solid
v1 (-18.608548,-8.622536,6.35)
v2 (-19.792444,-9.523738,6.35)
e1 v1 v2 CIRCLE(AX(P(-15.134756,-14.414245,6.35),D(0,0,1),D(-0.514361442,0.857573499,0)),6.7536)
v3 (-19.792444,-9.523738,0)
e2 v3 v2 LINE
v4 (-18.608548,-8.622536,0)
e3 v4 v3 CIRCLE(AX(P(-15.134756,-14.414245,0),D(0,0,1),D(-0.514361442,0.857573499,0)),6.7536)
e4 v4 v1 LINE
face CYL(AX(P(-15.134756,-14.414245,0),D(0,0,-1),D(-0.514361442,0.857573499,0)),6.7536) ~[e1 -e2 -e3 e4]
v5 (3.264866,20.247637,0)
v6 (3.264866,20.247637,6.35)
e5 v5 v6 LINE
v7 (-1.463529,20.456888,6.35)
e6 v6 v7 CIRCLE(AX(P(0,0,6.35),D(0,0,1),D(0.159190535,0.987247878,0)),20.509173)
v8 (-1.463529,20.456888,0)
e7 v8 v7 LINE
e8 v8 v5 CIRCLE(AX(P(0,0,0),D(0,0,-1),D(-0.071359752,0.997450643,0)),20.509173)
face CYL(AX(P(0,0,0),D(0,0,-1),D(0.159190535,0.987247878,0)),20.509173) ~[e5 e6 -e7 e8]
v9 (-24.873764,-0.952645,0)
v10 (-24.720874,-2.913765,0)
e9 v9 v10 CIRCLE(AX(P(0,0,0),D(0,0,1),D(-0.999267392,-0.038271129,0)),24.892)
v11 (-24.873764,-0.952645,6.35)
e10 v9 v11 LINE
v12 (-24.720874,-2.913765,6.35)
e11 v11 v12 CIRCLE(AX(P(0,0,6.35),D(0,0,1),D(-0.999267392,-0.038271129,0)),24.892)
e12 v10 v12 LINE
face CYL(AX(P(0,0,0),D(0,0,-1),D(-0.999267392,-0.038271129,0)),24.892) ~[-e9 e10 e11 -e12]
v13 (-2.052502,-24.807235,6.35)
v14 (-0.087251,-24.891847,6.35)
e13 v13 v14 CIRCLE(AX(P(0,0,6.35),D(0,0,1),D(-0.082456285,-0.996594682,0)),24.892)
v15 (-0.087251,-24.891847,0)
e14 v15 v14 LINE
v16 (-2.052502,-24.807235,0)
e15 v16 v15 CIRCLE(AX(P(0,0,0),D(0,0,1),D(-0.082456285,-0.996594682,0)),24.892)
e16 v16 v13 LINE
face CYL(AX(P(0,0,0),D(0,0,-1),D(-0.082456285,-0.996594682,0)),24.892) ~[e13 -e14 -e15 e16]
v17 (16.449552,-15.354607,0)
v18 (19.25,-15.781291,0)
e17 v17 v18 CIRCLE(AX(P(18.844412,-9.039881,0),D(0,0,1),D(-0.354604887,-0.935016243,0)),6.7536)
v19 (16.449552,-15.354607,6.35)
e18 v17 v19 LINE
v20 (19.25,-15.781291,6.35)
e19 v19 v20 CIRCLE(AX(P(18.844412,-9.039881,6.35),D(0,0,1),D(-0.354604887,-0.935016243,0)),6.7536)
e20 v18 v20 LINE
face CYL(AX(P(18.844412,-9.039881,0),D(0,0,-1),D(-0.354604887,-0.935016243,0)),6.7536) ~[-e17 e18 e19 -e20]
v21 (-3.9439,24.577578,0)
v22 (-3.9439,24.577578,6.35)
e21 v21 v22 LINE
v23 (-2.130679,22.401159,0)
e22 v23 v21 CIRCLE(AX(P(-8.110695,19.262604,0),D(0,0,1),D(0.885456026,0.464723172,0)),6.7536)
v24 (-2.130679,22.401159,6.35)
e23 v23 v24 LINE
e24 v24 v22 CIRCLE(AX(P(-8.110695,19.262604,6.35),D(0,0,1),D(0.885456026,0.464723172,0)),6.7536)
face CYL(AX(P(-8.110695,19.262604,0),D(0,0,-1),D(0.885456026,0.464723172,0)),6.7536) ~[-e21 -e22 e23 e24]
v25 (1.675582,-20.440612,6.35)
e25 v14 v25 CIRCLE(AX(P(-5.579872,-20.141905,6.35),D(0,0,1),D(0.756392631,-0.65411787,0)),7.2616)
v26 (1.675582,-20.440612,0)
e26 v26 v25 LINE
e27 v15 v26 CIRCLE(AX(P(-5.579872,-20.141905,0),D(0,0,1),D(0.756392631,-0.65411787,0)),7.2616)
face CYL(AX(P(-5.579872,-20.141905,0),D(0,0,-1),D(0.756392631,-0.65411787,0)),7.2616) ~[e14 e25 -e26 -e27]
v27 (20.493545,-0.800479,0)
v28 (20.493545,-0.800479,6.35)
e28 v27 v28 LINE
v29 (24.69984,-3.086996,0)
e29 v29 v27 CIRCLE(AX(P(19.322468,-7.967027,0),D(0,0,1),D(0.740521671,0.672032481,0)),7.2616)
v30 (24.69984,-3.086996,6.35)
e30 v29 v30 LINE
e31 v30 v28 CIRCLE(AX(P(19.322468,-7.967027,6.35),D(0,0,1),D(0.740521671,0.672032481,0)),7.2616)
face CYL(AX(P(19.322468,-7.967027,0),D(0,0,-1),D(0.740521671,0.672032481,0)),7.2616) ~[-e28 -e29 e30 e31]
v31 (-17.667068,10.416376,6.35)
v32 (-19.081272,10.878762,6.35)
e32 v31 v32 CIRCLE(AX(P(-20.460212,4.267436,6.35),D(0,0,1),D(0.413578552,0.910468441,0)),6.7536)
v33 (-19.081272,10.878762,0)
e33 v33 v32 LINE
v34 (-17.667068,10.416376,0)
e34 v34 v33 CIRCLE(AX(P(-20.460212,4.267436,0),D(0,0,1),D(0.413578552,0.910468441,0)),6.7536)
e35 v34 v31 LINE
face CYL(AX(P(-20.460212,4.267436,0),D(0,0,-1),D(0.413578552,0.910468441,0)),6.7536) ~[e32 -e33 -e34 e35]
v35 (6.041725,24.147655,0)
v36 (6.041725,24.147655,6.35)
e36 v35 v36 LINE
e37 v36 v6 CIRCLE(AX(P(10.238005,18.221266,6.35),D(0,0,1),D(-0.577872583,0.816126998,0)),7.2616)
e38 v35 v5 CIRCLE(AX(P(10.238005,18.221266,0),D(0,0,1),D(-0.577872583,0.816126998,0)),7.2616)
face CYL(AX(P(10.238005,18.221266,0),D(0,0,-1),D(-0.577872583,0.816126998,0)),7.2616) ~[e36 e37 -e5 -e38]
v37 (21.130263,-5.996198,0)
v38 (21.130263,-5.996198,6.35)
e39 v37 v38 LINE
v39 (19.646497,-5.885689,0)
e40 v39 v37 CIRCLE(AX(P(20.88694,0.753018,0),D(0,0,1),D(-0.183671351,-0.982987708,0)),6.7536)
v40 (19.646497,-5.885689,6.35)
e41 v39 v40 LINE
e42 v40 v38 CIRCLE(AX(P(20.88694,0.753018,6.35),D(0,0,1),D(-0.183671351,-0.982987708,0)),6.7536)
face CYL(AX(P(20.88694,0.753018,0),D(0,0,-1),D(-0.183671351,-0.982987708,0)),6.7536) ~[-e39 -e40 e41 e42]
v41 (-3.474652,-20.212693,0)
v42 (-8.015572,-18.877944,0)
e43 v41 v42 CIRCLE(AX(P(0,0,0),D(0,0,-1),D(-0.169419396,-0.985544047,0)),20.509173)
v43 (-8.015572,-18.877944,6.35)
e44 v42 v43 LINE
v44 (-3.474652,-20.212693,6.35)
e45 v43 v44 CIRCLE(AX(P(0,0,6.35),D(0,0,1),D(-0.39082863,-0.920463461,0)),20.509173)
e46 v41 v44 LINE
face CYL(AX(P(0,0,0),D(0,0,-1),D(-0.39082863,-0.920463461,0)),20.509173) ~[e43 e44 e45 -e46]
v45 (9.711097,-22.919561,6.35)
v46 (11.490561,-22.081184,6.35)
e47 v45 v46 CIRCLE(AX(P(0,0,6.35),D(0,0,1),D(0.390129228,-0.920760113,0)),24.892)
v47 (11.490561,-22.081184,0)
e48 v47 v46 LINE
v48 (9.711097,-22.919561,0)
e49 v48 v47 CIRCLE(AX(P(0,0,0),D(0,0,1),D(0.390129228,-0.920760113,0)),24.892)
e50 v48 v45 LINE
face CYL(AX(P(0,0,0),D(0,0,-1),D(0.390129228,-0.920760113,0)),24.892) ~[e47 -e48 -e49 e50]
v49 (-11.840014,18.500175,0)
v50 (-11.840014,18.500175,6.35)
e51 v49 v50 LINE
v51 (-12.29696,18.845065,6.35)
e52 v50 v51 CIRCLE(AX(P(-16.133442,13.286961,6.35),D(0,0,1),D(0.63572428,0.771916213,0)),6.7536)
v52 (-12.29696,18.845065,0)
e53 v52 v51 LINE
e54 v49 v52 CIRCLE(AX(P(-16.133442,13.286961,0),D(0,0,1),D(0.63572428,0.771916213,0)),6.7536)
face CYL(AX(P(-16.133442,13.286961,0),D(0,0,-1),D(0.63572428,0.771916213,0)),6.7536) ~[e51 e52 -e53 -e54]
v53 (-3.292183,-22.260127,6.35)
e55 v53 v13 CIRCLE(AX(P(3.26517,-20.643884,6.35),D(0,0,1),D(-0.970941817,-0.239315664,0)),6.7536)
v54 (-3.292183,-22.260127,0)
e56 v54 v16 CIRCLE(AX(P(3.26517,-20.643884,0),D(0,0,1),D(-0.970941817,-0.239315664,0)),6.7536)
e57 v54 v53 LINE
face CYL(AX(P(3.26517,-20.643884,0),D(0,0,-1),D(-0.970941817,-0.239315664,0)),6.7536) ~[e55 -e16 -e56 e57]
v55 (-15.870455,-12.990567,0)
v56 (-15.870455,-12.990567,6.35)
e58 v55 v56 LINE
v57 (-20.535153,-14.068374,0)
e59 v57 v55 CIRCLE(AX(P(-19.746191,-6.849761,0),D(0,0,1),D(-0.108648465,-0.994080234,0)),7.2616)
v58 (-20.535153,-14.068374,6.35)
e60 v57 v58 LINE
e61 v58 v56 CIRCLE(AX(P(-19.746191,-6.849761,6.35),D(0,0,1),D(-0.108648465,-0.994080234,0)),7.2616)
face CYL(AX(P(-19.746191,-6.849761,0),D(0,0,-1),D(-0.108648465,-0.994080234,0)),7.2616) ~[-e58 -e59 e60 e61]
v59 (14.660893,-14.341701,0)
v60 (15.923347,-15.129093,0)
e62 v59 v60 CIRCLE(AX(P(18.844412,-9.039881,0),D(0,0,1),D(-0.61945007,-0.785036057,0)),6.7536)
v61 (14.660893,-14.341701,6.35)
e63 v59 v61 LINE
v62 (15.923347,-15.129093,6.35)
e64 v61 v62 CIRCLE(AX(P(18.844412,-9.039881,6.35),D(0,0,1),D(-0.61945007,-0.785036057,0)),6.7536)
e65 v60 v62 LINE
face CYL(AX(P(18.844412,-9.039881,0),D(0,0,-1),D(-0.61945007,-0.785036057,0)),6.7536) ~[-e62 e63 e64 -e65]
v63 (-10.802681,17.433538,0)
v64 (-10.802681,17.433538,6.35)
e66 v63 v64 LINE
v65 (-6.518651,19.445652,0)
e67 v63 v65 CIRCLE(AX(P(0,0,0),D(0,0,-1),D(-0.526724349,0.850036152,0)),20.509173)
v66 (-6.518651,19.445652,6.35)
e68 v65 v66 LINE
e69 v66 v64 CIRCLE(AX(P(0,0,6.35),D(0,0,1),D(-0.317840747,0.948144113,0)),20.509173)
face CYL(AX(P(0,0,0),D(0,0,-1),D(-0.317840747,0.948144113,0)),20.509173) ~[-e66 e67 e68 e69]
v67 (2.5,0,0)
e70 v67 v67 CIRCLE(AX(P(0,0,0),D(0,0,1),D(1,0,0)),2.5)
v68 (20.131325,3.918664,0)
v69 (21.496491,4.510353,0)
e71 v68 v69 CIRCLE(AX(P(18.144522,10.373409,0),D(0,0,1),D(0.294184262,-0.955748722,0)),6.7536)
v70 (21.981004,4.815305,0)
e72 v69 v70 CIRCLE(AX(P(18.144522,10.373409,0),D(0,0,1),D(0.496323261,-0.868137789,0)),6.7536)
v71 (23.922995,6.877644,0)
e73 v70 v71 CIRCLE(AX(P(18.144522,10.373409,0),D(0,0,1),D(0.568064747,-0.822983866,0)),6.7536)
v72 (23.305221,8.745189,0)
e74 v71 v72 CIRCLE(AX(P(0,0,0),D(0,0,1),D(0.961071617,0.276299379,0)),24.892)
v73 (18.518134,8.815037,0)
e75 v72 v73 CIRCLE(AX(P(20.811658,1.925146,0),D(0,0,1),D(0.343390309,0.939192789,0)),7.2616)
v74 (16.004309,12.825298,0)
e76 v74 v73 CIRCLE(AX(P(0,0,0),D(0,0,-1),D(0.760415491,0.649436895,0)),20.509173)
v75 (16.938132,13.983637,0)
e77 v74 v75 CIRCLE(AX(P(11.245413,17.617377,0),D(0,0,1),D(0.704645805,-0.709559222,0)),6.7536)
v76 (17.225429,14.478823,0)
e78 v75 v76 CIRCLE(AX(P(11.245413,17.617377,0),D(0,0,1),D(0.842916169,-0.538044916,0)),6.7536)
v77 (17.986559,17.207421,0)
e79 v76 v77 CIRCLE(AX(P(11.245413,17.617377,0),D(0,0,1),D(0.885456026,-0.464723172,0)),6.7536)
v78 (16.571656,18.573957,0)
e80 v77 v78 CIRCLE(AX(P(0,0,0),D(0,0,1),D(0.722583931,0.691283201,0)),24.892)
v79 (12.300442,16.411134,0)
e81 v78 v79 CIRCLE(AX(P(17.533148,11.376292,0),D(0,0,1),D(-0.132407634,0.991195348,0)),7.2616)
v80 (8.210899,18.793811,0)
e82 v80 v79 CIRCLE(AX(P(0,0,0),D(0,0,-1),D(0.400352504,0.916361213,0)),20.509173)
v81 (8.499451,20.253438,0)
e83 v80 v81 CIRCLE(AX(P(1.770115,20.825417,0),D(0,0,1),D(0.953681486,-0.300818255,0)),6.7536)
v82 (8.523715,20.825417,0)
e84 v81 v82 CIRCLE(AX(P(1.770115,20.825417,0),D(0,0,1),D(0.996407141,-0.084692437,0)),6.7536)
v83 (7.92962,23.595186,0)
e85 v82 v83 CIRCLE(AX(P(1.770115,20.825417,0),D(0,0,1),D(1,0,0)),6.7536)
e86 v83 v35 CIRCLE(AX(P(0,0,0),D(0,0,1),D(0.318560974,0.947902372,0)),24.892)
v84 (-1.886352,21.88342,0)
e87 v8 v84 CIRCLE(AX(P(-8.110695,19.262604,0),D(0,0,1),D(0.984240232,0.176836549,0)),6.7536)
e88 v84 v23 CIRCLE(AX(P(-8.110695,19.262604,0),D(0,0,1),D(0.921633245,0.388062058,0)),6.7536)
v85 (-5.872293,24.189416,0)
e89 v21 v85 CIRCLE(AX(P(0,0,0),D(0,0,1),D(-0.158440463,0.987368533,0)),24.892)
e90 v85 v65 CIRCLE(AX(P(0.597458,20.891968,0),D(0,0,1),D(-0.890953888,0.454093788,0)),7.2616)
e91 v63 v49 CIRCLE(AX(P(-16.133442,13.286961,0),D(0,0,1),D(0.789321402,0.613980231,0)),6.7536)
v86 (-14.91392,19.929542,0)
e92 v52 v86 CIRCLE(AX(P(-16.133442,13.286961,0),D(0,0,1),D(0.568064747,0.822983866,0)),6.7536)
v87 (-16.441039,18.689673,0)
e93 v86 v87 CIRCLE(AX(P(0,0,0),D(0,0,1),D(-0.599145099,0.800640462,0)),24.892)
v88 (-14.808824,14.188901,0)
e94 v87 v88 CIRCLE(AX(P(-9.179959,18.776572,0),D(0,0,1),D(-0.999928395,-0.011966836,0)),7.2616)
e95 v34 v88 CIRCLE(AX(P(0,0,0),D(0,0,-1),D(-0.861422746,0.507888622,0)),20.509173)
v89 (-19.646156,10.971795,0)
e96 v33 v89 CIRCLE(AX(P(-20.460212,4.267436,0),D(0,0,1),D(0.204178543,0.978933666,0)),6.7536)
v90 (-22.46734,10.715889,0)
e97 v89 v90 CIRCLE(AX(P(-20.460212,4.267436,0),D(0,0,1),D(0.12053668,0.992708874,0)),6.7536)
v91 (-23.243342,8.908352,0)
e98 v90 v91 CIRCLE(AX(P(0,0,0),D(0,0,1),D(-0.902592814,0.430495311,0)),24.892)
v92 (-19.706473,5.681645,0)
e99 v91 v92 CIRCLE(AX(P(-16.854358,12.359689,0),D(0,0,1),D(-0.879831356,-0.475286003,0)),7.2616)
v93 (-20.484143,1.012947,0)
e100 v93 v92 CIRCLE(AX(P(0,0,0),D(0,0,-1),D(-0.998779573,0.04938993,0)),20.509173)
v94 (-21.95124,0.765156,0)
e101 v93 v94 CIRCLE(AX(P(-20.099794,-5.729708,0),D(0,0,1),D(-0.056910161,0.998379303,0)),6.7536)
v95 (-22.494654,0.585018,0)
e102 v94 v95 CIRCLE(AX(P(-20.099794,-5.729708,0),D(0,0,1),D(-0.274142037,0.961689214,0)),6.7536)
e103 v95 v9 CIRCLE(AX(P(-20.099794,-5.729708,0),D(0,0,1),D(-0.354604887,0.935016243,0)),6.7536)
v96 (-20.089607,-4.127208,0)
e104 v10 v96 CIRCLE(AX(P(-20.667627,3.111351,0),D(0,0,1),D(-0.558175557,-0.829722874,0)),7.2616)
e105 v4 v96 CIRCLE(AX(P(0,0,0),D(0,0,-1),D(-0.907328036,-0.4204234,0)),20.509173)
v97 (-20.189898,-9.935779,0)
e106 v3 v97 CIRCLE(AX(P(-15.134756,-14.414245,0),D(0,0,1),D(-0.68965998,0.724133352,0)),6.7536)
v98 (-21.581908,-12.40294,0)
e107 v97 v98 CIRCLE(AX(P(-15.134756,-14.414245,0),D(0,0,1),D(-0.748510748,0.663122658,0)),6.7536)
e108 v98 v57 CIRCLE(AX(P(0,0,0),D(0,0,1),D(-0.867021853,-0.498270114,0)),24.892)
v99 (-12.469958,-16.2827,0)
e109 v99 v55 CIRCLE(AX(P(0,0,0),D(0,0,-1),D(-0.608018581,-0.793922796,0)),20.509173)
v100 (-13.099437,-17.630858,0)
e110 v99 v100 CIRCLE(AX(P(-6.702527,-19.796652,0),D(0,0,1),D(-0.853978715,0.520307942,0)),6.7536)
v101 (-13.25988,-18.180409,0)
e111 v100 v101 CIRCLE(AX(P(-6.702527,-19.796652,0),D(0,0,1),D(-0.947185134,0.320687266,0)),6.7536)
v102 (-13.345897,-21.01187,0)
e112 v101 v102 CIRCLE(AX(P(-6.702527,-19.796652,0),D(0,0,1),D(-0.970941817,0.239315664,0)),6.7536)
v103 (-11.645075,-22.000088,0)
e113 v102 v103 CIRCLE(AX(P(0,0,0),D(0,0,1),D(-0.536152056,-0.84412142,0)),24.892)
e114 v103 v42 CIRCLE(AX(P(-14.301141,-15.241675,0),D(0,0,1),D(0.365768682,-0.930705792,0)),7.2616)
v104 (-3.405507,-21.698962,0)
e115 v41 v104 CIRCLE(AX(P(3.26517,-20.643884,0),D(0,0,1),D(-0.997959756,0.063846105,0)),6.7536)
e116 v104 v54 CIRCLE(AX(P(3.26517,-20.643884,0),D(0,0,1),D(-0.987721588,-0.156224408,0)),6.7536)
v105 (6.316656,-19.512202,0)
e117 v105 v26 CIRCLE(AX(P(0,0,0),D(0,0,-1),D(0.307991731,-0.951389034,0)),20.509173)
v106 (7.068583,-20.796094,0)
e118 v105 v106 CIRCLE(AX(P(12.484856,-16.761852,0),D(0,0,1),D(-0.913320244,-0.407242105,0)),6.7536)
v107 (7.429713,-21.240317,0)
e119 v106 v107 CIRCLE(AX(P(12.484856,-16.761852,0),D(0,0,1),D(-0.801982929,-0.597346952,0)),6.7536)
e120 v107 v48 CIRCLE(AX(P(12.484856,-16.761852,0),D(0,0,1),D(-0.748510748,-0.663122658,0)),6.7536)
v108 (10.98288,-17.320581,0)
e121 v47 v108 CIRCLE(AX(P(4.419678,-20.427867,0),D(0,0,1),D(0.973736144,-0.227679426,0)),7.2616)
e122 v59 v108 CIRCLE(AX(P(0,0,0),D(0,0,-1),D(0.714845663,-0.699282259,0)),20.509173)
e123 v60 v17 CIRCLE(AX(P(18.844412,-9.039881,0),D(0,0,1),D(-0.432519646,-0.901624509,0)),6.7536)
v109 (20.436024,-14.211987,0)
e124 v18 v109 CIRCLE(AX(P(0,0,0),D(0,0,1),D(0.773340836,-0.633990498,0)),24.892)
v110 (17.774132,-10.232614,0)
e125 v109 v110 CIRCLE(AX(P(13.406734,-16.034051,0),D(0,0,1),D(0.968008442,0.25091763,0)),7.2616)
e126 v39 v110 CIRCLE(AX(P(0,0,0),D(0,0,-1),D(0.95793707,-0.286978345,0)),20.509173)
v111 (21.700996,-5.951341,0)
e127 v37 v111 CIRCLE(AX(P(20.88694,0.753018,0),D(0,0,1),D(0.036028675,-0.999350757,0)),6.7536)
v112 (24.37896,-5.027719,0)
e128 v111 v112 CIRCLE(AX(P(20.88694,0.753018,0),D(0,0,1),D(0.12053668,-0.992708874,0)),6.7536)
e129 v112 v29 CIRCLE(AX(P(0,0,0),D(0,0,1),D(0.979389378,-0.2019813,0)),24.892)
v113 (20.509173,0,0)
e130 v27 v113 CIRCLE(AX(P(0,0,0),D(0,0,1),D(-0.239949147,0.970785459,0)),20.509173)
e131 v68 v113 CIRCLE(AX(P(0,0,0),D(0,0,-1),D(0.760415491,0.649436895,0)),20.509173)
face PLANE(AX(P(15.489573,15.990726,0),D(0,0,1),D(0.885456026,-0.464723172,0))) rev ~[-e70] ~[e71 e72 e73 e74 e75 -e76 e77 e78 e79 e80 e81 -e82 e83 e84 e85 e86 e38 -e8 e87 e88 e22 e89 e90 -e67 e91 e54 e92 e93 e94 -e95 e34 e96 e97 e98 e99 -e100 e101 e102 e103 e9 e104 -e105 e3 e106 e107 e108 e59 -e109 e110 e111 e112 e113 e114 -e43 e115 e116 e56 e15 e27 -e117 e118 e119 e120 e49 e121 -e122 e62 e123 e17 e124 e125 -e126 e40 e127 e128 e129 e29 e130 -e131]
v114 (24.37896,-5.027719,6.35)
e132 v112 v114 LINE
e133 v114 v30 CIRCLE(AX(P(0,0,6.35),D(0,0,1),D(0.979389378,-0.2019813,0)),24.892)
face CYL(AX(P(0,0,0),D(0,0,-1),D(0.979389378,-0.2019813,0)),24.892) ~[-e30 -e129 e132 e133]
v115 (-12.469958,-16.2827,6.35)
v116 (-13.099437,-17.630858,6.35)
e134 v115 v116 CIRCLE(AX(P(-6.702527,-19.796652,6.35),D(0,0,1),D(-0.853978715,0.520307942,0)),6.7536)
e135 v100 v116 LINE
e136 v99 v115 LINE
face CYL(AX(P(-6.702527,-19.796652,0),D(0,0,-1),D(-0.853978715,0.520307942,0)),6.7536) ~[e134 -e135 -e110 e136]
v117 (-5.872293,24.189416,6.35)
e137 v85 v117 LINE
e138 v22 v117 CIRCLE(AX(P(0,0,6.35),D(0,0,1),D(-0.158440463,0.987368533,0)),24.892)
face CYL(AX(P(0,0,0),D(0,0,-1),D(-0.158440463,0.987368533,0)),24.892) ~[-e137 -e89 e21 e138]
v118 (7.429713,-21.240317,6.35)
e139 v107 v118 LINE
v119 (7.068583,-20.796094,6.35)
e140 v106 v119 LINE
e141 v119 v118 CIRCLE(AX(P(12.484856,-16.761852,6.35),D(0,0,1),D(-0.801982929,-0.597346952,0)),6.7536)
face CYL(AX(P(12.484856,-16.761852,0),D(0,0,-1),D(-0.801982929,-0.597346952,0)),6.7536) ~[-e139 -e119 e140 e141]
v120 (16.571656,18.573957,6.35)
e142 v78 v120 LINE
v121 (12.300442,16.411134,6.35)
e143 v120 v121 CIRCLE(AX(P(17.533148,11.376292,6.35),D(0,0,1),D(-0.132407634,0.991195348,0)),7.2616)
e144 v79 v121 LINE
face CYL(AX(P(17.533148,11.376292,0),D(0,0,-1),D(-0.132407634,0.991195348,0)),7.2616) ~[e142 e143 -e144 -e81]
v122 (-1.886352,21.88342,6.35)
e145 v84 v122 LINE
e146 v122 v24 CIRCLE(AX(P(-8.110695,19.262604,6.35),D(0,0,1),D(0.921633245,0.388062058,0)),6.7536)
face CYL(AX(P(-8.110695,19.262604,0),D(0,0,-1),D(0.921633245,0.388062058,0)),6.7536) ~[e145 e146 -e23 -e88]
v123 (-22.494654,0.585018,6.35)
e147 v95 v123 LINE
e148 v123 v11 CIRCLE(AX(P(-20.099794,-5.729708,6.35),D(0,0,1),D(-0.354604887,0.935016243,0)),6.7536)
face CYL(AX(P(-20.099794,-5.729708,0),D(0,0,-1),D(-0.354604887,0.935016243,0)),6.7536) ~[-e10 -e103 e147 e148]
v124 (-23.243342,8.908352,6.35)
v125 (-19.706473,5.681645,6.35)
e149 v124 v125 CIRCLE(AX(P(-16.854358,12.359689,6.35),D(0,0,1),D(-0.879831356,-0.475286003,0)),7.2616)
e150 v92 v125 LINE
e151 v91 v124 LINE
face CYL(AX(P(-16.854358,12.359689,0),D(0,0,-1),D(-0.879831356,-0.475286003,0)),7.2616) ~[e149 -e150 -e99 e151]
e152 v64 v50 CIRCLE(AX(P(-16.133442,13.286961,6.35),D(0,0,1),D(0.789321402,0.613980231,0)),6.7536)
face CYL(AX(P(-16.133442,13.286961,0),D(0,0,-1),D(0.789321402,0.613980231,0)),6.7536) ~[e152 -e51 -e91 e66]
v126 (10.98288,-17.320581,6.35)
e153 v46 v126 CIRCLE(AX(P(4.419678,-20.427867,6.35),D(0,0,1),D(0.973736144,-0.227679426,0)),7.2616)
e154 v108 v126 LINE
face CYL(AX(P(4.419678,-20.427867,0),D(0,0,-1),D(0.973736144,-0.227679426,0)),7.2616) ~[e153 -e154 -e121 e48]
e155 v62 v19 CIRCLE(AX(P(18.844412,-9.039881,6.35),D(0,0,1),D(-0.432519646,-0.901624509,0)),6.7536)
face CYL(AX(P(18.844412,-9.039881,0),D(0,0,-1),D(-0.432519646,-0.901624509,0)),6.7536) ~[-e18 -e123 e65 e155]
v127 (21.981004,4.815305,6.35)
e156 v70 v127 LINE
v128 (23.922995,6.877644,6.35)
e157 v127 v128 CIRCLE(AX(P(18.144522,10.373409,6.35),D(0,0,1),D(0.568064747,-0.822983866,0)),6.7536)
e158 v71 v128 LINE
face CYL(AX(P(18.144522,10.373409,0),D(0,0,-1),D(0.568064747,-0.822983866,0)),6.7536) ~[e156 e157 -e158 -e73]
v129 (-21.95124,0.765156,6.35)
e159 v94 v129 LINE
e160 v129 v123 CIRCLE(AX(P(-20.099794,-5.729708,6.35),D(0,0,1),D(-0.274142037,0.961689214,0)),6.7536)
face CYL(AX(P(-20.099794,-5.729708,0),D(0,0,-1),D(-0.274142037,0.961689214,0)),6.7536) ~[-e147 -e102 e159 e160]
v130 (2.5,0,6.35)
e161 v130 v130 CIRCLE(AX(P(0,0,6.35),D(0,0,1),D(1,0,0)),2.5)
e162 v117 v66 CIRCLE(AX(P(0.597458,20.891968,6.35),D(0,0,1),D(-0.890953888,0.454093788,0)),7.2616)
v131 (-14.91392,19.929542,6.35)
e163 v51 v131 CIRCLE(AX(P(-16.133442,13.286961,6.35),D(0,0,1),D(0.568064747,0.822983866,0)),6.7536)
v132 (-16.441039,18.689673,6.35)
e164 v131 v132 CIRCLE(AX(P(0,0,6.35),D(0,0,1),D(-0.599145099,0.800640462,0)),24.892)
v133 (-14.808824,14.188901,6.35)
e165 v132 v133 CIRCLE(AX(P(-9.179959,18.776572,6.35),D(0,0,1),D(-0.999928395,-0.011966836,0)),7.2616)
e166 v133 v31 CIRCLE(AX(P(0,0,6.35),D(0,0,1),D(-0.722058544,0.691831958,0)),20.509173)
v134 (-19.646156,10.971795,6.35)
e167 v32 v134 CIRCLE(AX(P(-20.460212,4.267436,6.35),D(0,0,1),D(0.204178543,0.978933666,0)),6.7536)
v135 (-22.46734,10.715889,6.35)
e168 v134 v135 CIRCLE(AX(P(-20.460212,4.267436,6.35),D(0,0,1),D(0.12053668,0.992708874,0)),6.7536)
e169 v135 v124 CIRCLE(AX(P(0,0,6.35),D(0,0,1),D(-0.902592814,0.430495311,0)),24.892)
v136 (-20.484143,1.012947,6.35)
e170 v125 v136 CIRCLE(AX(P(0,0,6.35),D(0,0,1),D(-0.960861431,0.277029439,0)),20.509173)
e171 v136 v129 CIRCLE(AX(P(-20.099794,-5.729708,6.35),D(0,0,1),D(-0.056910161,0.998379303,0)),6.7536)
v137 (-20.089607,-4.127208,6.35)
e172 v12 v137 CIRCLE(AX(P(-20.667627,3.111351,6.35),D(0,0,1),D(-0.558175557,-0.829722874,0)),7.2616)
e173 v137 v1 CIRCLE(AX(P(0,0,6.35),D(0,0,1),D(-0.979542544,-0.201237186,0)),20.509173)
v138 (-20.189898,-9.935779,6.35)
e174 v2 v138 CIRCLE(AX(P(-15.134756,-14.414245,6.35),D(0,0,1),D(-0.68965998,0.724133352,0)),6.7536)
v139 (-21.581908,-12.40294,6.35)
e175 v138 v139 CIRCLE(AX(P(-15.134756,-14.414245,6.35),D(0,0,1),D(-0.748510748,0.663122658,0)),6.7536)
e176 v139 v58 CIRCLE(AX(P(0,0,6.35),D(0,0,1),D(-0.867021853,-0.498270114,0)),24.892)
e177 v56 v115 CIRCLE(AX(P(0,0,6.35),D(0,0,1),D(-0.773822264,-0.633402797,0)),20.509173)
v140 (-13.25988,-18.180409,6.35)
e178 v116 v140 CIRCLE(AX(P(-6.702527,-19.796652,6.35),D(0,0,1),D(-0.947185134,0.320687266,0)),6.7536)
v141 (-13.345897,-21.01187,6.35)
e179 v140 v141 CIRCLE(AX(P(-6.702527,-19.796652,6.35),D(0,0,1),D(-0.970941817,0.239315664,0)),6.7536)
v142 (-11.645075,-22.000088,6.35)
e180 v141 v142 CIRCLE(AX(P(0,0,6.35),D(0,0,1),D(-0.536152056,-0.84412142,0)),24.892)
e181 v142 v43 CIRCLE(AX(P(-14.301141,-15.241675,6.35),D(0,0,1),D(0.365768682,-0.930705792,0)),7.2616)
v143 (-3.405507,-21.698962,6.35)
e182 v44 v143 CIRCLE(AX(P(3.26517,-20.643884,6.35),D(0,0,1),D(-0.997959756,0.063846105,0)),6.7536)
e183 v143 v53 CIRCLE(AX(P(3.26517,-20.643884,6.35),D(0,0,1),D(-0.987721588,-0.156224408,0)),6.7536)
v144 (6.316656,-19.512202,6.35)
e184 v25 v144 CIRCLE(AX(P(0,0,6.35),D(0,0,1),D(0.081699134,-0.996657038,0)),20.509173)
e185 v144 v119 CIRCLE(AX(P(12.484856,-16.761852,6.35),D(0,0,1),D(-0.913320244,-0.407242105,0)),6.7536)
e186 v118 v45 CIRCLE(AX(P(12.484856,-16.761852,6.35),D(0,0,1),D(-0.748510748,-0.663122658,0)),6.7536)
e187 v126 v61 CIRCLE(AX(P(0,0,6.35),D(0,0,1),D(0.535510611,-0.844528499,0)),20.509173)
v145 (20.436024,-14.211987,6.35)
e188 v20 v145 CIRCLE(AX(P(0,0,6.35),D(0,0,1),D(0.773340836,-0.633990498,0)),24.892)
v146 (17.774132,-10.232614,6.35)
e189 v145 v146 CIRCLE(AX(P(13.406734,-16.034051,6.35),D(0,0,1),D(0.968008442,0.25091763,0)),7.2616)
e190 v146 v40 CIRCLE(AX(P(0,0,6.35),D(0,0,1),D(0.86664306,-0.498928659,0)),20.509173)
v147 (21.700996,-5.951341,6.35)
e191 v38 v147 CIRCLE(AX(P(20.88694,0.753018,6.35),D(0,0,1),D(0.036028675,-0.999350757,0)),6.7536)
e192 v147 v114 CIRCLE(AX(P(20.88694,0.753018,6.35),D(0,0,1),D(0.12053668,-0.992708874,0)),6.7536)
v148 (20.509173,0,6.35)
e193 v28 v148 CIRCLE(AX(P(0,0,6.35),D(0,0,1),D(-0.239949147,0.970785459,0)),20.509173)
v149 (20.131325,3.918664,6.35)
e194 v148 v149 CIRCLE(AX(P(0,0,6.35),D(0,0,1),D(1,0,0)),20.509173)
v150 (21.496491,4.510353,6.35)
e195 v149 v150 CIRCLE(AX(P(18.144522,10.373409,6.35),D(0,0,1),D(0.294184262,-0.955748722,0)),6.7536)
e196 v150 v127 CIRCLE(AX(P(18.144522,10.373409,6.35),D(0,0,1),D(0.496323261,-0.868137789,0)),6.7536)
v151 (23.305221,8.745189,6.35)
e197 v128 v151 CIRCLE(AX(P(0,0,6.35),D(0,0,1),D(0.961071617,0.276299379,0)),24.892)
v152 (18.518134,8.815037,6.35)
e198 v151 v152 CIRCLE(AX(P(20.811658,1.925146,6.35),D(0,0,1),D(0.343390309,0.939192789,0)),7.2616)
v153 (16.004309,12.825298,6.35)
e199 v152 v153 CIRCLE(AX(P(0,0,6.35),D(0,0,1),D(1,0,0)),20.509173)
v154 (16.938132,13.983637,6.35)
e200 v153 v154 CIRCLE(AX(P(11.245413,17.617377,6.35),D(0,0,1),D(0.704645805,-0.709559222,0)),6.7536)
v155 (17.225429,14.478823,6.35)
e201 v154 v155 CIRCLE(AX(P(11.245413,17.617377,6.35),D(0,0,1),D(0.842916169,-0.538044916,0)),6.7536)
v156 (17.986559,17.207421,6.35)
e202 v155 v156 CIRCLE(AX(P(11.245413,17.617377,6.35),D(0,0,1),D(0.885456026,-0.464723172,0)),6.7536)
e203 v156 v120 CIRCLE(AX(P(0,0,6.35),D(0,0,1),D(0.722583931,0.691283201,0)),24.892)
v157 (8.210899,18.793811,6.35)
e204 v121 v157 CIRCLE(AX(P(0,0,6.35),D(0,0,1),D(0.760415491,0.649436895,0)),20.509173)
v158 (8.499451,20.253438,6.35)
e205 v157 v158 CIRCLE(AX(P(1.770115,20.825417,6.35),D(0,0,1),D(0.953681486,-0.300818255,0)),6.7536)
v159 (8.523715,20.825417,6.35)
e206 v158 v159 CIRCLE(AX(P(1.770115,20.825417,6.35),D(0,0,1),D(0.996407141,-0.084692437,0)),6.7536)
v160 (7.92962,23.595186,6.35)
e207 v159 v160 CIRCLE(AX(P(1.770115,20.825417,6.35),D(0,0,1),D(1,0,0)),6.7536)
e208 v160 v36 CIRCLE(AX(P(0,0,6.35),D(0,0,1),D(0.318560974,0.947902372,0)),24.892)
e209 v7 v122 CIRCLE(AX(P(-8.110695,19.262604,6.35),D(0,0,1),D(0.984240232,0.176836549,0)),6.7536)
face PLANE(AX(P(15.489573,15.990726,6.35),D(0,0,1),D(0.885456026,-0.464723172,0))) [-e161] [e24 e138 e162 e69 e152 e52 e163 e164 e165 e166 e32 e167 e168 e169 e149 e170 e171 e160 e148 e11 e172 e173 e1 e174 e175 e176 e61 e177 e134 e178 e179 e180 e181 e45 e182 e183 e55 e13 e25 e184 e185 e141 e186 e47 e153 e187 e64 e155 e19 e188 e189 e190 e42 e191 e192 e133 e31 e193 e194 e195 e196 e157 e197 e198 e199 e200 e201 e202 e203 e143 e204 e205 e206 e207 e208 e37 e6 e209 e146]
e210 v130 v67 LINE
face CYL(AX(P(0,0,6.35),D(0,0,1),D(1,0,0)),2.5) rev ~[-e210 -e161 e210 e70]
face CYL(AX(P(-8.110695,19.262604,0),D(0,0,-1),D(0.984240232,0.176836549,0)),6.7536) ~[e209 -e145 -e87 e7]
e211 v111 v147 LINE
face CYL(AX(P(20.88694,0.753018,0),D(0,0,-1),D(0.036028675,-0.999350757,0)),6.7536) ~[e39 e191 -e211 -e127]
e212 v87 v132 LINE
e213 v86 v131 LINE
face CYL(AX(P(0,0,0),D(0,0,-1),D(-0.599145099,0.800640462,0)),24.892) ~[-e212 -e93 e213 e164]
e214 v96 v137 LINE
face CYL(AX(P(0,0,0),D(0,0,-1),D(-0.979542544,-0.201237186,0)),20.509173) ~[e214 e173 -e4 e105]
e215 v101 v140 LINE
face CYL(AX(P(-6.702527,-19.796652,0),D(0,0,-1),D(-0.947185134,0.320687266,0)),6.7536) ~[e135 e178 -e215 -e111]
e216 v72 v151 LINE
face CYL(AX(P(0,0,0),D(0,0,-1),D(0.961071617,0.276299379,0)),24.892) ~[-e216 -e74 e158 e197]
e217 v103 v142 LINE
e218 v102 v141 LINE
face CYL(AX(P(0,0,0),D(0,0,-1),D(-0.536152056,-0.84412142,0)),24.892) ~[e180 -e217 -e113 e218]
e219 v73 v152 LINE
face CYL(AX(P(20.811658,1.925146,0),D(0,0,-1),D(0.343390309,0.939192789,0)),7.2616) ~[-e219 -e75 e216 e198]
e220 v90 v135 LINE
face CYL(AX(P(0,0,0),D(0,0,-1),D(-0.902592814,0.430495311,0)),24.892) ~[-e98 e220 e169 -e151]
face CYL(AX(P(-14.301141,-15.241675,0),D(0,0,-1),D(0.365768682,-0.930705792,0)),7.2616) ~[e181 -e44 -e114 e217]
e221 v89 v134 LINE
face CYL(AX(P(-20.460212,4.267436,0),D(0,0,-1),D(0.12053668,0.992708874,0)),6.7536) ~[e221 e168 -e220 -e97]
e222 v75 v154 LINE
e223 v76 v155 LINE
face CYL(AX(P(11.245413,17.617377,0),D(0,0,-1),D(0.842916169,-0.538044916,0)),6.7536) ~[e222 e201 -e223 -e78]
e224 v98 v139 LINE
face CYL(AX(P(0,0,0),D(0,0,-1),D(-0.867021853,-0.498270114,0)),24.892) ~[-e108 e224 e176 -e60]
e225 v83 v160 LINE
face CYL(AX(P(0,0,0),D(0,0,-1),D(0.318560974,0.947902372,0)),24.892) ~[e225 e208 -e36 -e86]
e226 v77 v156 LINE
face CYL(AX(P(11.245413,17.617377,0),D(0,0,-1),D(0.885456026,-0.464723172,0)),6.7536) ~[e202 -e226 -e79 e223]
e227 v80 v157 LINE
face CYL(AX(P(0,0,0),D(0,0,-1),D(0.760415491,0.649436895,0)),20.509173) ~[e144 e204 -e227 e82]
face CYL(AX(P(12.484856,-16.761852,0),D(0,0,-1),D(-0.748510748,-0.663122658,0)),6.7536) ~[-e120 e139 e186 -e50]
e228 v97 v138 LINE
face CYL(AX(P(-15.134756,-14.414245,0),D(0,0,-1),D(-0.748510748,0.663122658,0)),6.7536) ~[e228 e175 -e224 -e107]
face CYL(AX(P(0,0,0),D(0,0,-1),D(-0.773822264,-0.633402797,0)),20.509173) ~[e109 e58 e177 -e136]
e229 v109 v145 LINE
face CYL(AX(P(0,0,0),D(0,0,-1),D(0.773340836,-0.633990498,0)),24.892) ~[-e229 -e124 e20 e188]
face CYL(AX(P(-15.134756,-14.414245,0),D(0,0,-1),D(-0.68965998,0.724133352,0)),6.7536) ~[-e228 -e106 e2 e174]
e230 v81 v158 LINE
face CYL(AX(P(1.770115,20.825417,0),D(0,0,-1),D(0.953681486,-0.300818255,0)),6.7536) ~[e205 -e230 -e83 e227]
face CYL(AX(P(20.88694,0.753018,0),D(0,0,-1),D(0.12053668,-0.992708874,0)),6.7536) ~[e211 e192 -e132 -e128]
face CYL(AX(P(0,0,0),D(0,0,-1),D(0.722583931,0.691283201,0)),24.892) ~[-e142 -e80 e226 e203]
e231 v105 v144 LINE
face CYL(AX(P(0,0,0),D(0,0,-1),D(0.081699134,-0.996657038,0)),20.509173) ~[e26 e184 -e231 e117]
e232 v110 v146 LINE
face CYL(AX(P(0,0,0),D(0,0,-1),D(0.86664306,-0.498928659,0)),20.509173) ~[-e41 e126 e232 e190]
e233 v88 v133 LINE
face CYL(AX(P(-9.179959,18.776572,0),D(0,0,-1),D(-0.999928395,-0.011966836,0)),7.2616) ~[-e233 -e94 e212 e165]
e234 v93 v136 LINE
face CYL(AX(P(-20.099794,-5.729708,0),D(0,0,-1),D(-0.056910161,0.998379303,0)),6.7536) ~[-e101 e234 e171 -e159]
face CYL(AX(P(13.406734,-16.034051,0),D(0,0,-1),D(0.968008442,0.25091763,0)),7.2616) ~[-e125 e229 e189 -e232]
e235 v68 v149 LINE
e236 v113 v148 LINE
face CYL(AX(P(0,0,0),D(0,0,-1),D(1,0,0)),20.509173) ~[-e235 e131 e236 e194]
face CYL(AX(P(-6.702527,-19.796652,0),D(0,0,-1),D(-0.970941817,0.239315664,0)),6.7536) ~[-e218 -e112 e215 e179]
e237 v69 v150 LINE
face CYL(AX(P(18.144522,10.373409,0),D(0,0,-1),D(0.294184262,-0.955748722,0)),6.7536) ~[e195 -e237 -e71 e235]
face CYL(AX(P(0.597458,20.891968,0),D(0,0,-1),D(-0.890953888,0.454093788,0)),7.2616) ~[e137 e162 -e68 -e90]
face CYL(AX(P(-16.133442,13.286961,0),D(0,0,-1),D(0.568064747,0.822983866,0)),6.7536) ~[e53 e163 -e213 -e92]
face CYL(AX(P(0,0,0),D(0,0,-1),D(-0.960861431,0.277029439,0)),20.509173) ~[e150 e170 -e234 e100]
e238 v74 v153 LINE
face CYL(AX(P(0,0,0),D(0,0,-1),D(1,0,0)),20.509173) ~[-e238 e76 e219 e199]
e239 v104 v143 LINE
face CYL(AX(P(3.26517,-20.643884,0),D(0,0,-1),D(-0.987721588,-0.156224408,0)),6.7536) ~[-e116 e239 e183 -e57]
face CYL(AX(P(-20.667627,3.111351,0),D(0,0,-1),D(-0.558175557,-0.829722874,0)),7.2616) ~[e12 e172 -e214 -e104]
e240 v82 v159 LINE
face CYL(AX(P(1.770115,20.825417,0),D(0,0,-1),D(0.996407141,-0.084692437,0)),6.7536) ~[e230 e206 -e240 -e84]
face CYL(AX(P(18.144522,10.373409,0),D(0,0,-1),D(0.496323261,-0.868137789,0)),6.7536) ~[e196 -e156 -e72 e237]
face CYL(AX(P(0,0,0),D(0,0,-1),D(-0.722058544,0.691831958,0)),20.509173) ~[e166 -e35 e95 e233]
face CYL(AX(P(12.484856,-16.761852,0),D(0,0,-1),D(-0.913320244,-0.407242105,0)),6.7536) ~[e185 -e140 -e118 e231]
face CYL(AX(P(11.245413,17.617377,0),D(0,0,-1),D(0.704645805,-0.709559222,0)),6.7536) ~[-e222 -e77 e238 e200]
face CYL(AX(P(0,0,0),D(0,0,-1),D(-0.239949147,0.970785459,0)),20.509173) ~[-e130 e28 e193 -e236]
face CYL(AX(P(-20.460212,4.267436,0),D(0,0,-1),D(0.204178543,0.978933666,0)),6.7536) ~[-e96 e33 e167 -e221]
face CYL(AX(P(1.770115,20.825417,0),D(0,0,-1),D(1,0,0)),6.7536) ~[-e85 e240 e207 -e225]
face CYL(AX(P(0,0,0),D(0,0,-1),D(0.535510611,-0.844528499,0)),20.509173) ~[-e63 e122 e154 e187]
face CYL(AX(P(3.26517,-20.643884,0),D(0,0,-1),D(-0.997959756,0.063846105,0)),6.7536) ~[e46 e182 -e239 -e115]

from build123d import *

# Parameters (mm, degrees)
F1_DEPTH = 6.35
F2_COUNT = 13
F3_R     = 2.5
F4_DEPTH = 6.351


with BuildPart() as f1:
    # F0 (on Top) → F1 (new body)
    with BuildSketch(Plane.XY):
        with BuildLine():
            ThreePointArc((7.9296197565, 23.5951858335), (6.9911317973, 23.8900761864), (6.0417249702, 24.1476546146))
            ThreePointArc((6.0417249702, 24.1476546146), (4.3226425573, 22.4330749308), (3.2648662162, 20.2476374354))
            ThreePointArc((3.2648662162, 20.2476374354), (5.7837443287, 19.6767495961), (8.2108987358, 18.7938105523))
            ThreePointArc((8.2108987358, 18.7938105523), (8.3954934616, 19.5156536929), (8.4994507341, 20.2534379554))
            ThreePointArc((8.4994507341, 20.2534379554), (8.5176465567, 20.5391701676), (8.5237154667, 20.8254168329))
            ThreePointArc((8.5237154667, 20.8254168329), (8.373521449, 22.2418004346), (7.9296197565, 23.5951858335))
        make_face()
        with BuildLine():
            ThreePointArc((4.0264902572, 14.4598933509), (-1.7431476836, 15.057566034), (-4.9211585336, 19.9100068261))
            ThreePointArc((-4.9211585336, 19.9100068261), (-12.6431262329, -16.1486077476), (20.5091729021, 0))
            ThreePointArc((20.5091729021, 0), (19.2415803806, 7.0984334598), (15.5954927821, 13.3194135761))
            ThreePointArc((15.5954927821, 13.3194135761), (9.5256046991, 10.9946956396), (4.0264902572, 14.4598933509))
        make_face()
        with BuildLine():
            ThreePointArc((3.2648662162, 20.2476374354), (-0.8451772993, 20.4917507417), (-4.9211585336, 19.9100068261))
            ThreePointArc((-4.9211585336, 19.9100068261), (-1.7431476836, 15.057566034), (4.0264902572, 14.4598933509))
            ThreePointArc((4.0264902572, 14.4598933509), (3.0384725246, 17.2738616412), (3.2648662162, 20.2476374354))
        make_face()
        with BuildLine():
            ThreePointArc((4.0264902572, 14.4598933509), (9.5256046991, 10.9946956396), (15.5954927821, 13.3194135761))
            ThreePointArc((15.5954927821, 13.3194135761), (12.2138579016, 16.4756744411), (8.2108987358, 18.7938105523))
            ThreePointArc((8.2108987358, 18.7938105523), (6.6287005247, 16.1344397874), (4.0264902572, 14.4598933509))
        make_face()
        with BuildLine():
            ThreePointArc((8.2108987358, 18.7938105523), (5.7837443287, 19.6767495961), (3.2648662162, 20.2476374354))
            ThreePointArc((3.2648662162, 20.2476374354), (3.0384725246, 17.2738616412), (4.0264902572, 14.4598933509))
            ThreePointArc((4.0264902572, 14.4598933509), (6.6287005247, 16.1344397874), (8.2108987358, 18.7938105523))
        make_face()
    extrude(amount=F1_DEPTH)

    # F2: F1 ×13 about axis
    f2_axis = Axis((0, 0, 6.35), (0, 0, 1))


with BuildPart() as f1_1:
    add(f1.part)
    for i in range(1, F2_COUNT):
        add(f1.part.rotate(f2_axis, i * 360 / F2_COUNT))

    # F3 (on face) → F4 (cut, through all)
    with BuildSketch(Plane.XY.offset(6.35)):
        Circle(F3_R)
    extrude(amount=-F4_DEPTH, mode=Mode.SUBTRACT)


solid = f1_1.part
